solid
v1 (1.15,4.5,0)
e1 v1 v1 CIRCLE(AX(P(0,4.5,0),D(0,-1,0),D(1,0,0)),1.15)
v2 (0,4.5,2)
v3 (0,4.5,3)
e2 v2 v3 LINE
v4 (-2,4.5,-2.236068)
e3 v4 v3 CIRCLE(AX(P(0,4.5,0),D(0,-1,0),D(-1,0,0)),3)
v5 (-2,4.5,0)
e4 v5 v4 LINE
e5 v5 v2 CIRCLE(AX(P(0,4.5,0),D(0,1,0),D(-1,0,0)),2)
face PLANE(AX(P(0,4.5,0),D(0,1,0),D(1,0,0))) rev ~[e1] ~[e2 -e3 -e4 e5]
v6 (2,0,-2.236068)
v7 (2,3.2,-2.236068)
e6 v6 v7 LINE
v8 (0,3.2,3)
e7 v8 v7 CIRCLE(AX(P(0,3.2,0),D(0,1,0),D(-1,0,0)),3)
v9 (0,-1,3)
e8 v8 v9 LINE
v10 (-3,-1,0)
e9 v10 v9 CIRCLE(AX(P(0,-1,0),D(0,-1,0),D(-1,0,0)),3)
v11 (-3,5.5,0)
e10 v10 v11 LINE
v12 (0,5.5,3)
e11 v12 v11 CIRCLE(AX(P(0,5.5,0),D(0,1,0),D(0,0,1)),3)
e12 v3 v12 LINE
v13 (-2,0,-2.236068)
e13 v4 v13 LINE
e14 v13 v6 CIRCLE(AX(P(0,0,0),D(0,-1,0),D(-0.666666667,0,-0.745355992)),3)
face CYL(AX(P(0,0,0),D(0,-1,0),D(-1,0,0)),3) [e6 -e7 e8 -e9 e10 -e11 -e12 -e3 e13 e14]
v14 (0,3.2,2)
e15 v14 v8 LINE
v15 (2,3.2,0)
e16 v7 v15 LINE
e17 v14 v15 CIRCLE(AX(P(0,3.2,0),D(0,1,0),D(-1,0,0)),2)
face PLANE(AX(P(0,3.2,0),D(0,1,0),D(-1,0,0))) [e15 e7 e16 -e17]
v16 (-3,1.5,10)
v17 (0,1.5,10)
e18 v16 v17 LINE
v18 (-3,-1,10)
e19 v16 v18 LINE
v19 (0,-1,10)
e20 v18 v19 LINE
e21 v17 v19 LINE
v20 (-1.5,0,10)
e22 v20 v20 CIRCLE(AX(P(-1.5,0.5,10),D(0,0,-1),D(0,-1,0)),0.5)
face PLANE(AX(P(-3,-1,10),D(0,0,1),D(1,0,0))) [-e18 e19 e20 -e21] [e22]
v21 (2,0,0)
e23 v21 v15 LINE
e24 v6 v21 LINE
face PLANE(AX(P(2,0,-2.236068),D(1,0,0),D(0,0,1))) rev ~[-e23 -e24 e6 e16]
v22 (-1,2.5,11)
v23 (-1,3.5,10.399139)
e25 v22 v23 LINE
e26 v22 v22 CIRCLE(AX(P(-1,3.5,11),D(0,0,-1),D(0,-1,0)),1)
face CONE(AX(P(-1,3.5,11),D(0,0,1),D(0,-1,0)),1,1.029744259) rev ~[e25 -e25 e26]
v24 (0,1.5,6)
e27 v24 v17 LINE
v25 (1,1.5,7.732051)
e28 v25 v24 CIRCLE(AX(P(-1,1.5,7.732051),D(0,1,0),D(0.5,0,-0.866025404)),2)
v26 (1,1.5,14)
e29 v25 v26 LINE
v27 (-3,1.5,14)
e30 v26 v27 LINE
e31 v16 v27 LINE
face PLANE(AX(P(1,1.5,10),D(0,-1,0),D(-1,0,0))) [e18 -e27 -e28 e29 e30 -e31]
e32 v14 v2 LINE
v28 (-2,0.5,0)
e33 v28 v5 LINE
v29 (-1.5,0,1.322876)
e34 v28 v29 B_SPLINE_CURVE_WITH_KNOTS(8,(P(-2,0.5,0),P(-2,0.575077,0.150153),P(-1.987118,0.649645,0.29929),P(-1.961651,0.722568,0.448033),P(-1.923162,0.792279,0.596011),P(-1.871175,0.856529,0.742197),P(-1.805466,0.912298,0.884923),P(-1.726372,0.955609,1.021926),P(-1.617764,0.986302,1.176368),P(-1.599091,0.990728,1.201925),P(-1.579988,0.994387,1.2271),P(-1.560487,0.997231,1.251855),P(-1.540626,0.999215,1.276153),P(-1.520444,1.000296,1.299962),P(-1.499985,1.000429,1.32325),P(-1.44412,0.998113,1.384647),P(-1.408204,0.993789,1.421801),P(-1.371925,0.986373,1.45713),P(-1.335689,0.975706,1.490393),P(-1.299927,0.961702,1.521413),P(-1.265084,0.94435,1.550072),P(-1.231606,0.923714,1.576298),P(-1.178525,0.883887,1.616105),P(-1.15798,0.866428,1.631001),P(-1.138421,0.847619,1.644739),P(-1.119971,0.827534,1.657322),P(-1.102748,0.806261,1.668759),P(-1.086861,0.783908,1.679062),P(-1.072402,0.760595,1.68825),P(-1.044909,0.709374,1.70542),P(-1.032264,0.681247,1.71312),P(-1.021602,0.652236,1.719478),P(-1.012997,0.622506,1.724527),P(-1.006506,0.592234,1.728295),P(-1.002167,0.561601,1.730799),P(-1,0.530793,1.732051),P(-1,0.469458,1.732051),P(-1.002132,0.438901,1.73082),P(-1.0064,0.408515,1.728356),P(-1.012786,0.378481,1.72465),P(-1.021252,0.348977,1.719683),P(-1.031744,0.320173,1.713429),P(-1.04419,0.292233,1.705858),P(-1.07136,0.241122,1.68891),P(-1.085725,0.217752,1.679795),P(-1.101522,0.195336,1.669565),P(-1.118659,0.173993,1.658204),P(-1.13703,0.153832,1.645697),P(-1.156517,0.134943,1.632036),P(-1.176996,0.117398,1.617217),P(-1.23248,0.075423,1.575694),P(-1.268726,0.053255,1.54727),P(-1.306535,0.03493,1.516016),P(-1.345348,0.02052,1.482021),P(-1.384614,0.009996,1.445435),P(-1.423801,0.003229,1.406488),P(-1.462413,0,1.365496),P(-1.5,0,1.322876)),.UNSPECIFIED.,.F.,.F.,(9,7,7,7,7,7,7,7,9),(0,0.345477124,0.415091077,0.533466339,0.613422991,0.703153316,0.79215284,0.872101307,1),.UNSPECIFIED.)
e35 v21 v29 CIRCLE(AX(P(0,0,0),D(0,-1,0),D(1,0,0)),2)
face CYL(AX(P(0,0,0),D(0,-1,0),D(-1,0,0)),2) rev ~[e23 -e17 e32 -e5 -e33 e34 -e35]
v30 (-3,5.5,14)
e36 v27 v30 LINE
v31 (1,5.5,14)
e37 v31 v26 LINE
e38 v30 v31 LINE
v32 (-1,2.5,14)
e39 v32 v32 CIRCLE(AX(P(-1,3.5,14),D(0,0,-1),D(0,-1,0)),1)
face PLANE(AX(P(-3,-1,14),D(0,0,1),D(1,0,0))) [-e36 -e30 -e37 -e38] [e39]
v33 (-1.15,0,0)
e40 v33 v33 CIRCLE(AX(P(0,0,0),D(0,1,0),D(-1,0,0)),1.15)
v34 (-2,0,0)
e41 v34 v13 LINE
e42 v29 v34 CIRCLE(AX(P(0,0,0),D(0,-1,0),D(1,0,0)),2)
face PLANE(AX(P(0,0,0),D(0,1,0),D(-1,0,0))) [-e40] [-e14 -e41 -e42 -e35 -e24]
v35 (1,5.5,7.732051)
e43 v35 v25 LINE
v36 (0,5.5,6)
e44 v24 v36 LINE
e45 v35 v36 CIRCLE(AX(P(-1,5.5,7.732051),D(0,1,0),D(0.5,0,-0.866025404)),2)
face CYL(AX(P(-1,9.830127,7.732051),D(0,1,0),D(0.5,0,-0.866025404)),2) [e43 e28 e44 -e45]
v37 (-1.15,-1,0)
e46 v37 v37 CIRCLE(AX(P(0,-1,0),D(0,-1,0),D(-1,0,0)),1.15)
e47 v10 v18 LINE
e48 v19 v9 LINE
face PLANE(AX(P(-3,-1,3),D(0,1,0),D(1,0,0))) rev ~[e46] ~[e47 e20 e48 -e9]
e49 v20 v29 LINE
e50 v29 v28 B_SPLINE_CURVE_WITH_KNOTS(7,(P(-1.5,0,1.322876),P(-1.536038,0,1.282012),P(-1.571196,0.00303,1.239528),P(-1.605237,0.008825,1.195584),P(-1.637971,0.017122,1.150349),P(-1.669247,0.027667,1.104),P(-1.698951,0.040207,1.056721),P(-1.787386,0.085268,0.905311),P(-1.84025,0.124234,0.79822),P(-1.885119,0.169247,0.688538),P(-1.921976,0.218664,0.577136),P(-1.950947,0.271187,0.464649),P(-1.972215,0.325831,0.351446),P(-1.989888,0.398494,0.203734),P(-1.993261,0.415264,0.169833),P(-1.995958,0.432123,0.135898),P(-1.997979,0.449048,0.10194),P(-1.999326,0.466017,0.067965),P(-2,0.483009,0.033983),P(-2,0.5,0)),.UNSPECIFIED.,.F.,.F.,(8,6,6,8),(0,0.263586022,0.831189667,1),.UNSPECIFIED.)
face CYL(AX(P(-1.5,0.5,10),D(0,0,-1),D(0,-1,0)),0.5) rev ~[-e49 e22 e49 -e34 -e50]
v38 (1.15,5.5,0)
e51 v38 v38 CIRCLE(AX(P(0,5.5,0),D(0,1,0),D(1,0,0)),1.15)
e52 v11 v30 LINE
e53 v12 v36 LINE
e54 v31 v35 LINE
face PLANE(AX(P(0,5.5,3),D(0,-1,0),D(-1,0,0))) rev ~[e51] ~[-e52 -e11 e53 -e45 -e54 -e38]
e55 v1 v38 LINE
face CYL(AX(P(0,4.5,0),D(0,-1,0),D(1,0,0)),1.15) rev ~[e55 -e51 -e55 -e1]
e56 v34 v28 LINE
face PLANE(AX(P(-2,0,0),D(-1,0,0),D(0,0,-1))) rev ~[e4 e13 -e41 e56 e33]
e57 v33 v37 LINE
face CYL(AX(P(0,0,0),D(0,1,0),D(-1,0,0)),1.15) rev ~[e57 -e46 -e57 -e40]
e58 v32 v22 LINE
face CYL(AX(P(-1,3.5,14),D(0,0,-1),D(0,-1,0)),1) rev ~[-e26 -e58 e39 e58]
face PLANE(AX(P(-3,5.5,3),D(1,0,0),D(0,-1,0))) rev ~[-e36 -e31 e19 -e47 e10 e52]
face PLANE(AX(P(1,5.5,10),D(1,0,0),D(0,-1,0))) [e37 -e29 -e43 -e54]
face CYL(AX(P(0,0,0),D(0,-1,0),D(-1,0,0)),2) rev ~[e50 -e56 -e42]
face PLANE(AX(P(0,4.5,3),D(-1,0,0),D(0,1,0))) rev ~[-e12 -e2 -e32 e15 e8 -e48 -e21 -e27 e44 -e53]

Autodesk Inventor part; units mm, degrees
ref_plane "YZ Plane" through (0, 0, 0) normal (1, 0, 0) x (0, 1, 0)
ref_plane "XZ Plane" through (0, 0, 0) normal (0, 1, 0) x (-1, 0, 0)
ref_plane "XY Plane" through (0, 0, 0) normal (0, 0, 1) x (1, 0, 0)
sketch "スケッチ1" plane through (0, 0, 0) normal (0, 1, 0) x (-1, 0, 0)
  circle A0 centre (0, 0) radius 1.15
  circle A1 centre (0, 0) radius 2
  circle A2 centre (0, 0) radius 3
  line L0 (0, 0) -> (0, 3)
  line L1 (-2, 0) -> (2, 0)
  line L2 (2, 0) -> (2, -3)
  line L3 (2, -3) -> (-2, -3)
  line L4 (-2, -3) -> (-2, 0)
  line L5 (0, 0) -> (3, 0)
  line L6 (3, 0) -> (3, 3)
  line L7 (3, 3) -> (0, 3)
  line L8 (0, 3) -> (0, 0)
  point P0 (-2, -2.2361)
  point P1 (0, 2)
  point P2 (2, -2.2361)
  dimension "d1" = 4
  dimension "d2" = 6
  dimension "d0" = 2.3
extrude "押し出し1" add sketch "スケッチ1" along normal blind 3.2 contours A1 L4 A2 L0
extrude "押し出し2" add sketch "スケッチ1" along normal blind 4.5 contours L5 A2 L2 | A1 L0 A2 L5 | A2 L7 L6
extrude "押し出し3" add sketch "スケッチ1" against normal blind 1 contours L1 A1 A0 | A0 L0 A1 L1 | A0 L1 A1 L0 | L2 A2 L4 A1 | L5 A2 L2 | A1 L0 A2 L5 | A1 L4 A2 L0 | A2 L7 L6
sketch "スケッチ2" plane through (0, 4.5, 0) normal (0, 1, 0) x (1, 0, 0)
  circle A0 centre (0, 0) radius 1.15
  circle A1 centre (0, 0) radius 2
  circle A2 centre (0, 0) radius 3
  line L0 (0, 0) -> (-3, 0)
  line L1 (-3, 0) -> (-3, -3)
  line L2 (-3, -3) -> (0, -3)
  line L3 (0, -3) -> (0, 0)
  dimension "d9" = 2.3
  dimension "d10" = 4
  dimension "d11" = 6
extrude "押し出し4" add sketch "スケッチ2" along normal blind 1 contours A0 L0 A1 L3 | A0 L3 A1 L0 | L0 A2 L3 A1 | A1 L3 A2 L0 | A2 L2 L1
sketch "スケッチ3" plane through (-3, -1, 3) normal (0, 0, 1) x (1, 0, 0)
  line L0 (0, 6.5) -> (0, 0) projected
  line L1 (3, 5.5) -> (3, 6.5) projected
  line L2 (0, 0) -> (3, 0)
  line L3 (3, 0) -> (3, 6.5)
  line L4 (3, 6.5) -> (0, 6.5)
  line L5 (0, 6.5) -> (0, 0)
  point P0 (3, 1)
extrude "押し出し5" add sketch "スケッチ3" along normal blind 7
sketch "スケッチ4" plane through (-3, -1, 10) normal (0, 0, 1) x (1, 0, 0)
  line L0 (4.15, 0) -> (1.85, 0) projected
  line L1 (3, 0) -> (1.5, 0)
  line L2 (1.5, 0) -> (1.5, 1.5)
  line L3 (1.5, 1.5) -> (3, 1.5)
  line L4 (3, 1.5) -> (3, 0)
  point P0 (3, 1)
  dimension "d16" = 1.5
  dimension "d17" = 1.5
hole "穴1" at (-1.5, 0.5, 10) direction (0, 0, -1) diameter 1 end through all
sketch "スケッチ5" plane through (0, 3.2, 3) normal (1, 0, 0) x (0, 0, -1)
  point P0 (3, -3.2)
sketch "スケッチ7" plane through (0, 5.5, 0) normal (0, 1, 0) x (1, 0, 0)
  line L0 (0, -3) -> (0, -10) projected
  line L1 (0, -10) -> (-3, -10)
  line L2 (-3, -10) -> (-3, -50)
  line L3 (-3, -50) -> (0, -50)
  line L4 (0, -50) -> (0, -10)
  point P0 (0, 0)
  dimension "d33" = 3
  dimension "d34" = 40
sketch "スケッチ8" plane through (-3, -1, 10) normal (0, 0, 1) x (1, 0, 0)
  line L0 (0, 0) -> (0, 6.5) projected
  line L1 (0, 6.5) -> (4, 6.5)
  line L2 (4, 6.5) -> (4, 2.5)
  line L3 (4, 2.5) -> (0, 2.5)
  line L4 (0, 2.5) -> (0, 6.5)
  point P0 (3, 1)
  dimension "d35" = 4
  dimension "d36" = 4
extrude "押し出し7" add sketch "スケッチ8" along normal mid plane 8
sketch "スケッチ9" plane through (-3, -1, 14) normal (0, 0, 1) x (1, 0, 0)
  line L0 (0, 0) -> (0, 6.5) projected
  line L1 (0, 6.5) -> (2, 6.5)
  line L2 (2, 6.5) -> (2, 4.5)
  line L3 (2, 4.5) -> (0, 4.5)
  line L4 (0, 4.5) -> (0, 6.5)
  point P0 (3, 1)
  dimension "d39" = 2
  dimension "d40" = 2
hole "穴2" at (-1, 3.5, 14) direction (0, 0, -1) diameter 2 depth 3 tip angle 118
fillet "フィレット1" radius 2 1 edges at (1, 3.5, 6)
properties part number "srod1.2"
